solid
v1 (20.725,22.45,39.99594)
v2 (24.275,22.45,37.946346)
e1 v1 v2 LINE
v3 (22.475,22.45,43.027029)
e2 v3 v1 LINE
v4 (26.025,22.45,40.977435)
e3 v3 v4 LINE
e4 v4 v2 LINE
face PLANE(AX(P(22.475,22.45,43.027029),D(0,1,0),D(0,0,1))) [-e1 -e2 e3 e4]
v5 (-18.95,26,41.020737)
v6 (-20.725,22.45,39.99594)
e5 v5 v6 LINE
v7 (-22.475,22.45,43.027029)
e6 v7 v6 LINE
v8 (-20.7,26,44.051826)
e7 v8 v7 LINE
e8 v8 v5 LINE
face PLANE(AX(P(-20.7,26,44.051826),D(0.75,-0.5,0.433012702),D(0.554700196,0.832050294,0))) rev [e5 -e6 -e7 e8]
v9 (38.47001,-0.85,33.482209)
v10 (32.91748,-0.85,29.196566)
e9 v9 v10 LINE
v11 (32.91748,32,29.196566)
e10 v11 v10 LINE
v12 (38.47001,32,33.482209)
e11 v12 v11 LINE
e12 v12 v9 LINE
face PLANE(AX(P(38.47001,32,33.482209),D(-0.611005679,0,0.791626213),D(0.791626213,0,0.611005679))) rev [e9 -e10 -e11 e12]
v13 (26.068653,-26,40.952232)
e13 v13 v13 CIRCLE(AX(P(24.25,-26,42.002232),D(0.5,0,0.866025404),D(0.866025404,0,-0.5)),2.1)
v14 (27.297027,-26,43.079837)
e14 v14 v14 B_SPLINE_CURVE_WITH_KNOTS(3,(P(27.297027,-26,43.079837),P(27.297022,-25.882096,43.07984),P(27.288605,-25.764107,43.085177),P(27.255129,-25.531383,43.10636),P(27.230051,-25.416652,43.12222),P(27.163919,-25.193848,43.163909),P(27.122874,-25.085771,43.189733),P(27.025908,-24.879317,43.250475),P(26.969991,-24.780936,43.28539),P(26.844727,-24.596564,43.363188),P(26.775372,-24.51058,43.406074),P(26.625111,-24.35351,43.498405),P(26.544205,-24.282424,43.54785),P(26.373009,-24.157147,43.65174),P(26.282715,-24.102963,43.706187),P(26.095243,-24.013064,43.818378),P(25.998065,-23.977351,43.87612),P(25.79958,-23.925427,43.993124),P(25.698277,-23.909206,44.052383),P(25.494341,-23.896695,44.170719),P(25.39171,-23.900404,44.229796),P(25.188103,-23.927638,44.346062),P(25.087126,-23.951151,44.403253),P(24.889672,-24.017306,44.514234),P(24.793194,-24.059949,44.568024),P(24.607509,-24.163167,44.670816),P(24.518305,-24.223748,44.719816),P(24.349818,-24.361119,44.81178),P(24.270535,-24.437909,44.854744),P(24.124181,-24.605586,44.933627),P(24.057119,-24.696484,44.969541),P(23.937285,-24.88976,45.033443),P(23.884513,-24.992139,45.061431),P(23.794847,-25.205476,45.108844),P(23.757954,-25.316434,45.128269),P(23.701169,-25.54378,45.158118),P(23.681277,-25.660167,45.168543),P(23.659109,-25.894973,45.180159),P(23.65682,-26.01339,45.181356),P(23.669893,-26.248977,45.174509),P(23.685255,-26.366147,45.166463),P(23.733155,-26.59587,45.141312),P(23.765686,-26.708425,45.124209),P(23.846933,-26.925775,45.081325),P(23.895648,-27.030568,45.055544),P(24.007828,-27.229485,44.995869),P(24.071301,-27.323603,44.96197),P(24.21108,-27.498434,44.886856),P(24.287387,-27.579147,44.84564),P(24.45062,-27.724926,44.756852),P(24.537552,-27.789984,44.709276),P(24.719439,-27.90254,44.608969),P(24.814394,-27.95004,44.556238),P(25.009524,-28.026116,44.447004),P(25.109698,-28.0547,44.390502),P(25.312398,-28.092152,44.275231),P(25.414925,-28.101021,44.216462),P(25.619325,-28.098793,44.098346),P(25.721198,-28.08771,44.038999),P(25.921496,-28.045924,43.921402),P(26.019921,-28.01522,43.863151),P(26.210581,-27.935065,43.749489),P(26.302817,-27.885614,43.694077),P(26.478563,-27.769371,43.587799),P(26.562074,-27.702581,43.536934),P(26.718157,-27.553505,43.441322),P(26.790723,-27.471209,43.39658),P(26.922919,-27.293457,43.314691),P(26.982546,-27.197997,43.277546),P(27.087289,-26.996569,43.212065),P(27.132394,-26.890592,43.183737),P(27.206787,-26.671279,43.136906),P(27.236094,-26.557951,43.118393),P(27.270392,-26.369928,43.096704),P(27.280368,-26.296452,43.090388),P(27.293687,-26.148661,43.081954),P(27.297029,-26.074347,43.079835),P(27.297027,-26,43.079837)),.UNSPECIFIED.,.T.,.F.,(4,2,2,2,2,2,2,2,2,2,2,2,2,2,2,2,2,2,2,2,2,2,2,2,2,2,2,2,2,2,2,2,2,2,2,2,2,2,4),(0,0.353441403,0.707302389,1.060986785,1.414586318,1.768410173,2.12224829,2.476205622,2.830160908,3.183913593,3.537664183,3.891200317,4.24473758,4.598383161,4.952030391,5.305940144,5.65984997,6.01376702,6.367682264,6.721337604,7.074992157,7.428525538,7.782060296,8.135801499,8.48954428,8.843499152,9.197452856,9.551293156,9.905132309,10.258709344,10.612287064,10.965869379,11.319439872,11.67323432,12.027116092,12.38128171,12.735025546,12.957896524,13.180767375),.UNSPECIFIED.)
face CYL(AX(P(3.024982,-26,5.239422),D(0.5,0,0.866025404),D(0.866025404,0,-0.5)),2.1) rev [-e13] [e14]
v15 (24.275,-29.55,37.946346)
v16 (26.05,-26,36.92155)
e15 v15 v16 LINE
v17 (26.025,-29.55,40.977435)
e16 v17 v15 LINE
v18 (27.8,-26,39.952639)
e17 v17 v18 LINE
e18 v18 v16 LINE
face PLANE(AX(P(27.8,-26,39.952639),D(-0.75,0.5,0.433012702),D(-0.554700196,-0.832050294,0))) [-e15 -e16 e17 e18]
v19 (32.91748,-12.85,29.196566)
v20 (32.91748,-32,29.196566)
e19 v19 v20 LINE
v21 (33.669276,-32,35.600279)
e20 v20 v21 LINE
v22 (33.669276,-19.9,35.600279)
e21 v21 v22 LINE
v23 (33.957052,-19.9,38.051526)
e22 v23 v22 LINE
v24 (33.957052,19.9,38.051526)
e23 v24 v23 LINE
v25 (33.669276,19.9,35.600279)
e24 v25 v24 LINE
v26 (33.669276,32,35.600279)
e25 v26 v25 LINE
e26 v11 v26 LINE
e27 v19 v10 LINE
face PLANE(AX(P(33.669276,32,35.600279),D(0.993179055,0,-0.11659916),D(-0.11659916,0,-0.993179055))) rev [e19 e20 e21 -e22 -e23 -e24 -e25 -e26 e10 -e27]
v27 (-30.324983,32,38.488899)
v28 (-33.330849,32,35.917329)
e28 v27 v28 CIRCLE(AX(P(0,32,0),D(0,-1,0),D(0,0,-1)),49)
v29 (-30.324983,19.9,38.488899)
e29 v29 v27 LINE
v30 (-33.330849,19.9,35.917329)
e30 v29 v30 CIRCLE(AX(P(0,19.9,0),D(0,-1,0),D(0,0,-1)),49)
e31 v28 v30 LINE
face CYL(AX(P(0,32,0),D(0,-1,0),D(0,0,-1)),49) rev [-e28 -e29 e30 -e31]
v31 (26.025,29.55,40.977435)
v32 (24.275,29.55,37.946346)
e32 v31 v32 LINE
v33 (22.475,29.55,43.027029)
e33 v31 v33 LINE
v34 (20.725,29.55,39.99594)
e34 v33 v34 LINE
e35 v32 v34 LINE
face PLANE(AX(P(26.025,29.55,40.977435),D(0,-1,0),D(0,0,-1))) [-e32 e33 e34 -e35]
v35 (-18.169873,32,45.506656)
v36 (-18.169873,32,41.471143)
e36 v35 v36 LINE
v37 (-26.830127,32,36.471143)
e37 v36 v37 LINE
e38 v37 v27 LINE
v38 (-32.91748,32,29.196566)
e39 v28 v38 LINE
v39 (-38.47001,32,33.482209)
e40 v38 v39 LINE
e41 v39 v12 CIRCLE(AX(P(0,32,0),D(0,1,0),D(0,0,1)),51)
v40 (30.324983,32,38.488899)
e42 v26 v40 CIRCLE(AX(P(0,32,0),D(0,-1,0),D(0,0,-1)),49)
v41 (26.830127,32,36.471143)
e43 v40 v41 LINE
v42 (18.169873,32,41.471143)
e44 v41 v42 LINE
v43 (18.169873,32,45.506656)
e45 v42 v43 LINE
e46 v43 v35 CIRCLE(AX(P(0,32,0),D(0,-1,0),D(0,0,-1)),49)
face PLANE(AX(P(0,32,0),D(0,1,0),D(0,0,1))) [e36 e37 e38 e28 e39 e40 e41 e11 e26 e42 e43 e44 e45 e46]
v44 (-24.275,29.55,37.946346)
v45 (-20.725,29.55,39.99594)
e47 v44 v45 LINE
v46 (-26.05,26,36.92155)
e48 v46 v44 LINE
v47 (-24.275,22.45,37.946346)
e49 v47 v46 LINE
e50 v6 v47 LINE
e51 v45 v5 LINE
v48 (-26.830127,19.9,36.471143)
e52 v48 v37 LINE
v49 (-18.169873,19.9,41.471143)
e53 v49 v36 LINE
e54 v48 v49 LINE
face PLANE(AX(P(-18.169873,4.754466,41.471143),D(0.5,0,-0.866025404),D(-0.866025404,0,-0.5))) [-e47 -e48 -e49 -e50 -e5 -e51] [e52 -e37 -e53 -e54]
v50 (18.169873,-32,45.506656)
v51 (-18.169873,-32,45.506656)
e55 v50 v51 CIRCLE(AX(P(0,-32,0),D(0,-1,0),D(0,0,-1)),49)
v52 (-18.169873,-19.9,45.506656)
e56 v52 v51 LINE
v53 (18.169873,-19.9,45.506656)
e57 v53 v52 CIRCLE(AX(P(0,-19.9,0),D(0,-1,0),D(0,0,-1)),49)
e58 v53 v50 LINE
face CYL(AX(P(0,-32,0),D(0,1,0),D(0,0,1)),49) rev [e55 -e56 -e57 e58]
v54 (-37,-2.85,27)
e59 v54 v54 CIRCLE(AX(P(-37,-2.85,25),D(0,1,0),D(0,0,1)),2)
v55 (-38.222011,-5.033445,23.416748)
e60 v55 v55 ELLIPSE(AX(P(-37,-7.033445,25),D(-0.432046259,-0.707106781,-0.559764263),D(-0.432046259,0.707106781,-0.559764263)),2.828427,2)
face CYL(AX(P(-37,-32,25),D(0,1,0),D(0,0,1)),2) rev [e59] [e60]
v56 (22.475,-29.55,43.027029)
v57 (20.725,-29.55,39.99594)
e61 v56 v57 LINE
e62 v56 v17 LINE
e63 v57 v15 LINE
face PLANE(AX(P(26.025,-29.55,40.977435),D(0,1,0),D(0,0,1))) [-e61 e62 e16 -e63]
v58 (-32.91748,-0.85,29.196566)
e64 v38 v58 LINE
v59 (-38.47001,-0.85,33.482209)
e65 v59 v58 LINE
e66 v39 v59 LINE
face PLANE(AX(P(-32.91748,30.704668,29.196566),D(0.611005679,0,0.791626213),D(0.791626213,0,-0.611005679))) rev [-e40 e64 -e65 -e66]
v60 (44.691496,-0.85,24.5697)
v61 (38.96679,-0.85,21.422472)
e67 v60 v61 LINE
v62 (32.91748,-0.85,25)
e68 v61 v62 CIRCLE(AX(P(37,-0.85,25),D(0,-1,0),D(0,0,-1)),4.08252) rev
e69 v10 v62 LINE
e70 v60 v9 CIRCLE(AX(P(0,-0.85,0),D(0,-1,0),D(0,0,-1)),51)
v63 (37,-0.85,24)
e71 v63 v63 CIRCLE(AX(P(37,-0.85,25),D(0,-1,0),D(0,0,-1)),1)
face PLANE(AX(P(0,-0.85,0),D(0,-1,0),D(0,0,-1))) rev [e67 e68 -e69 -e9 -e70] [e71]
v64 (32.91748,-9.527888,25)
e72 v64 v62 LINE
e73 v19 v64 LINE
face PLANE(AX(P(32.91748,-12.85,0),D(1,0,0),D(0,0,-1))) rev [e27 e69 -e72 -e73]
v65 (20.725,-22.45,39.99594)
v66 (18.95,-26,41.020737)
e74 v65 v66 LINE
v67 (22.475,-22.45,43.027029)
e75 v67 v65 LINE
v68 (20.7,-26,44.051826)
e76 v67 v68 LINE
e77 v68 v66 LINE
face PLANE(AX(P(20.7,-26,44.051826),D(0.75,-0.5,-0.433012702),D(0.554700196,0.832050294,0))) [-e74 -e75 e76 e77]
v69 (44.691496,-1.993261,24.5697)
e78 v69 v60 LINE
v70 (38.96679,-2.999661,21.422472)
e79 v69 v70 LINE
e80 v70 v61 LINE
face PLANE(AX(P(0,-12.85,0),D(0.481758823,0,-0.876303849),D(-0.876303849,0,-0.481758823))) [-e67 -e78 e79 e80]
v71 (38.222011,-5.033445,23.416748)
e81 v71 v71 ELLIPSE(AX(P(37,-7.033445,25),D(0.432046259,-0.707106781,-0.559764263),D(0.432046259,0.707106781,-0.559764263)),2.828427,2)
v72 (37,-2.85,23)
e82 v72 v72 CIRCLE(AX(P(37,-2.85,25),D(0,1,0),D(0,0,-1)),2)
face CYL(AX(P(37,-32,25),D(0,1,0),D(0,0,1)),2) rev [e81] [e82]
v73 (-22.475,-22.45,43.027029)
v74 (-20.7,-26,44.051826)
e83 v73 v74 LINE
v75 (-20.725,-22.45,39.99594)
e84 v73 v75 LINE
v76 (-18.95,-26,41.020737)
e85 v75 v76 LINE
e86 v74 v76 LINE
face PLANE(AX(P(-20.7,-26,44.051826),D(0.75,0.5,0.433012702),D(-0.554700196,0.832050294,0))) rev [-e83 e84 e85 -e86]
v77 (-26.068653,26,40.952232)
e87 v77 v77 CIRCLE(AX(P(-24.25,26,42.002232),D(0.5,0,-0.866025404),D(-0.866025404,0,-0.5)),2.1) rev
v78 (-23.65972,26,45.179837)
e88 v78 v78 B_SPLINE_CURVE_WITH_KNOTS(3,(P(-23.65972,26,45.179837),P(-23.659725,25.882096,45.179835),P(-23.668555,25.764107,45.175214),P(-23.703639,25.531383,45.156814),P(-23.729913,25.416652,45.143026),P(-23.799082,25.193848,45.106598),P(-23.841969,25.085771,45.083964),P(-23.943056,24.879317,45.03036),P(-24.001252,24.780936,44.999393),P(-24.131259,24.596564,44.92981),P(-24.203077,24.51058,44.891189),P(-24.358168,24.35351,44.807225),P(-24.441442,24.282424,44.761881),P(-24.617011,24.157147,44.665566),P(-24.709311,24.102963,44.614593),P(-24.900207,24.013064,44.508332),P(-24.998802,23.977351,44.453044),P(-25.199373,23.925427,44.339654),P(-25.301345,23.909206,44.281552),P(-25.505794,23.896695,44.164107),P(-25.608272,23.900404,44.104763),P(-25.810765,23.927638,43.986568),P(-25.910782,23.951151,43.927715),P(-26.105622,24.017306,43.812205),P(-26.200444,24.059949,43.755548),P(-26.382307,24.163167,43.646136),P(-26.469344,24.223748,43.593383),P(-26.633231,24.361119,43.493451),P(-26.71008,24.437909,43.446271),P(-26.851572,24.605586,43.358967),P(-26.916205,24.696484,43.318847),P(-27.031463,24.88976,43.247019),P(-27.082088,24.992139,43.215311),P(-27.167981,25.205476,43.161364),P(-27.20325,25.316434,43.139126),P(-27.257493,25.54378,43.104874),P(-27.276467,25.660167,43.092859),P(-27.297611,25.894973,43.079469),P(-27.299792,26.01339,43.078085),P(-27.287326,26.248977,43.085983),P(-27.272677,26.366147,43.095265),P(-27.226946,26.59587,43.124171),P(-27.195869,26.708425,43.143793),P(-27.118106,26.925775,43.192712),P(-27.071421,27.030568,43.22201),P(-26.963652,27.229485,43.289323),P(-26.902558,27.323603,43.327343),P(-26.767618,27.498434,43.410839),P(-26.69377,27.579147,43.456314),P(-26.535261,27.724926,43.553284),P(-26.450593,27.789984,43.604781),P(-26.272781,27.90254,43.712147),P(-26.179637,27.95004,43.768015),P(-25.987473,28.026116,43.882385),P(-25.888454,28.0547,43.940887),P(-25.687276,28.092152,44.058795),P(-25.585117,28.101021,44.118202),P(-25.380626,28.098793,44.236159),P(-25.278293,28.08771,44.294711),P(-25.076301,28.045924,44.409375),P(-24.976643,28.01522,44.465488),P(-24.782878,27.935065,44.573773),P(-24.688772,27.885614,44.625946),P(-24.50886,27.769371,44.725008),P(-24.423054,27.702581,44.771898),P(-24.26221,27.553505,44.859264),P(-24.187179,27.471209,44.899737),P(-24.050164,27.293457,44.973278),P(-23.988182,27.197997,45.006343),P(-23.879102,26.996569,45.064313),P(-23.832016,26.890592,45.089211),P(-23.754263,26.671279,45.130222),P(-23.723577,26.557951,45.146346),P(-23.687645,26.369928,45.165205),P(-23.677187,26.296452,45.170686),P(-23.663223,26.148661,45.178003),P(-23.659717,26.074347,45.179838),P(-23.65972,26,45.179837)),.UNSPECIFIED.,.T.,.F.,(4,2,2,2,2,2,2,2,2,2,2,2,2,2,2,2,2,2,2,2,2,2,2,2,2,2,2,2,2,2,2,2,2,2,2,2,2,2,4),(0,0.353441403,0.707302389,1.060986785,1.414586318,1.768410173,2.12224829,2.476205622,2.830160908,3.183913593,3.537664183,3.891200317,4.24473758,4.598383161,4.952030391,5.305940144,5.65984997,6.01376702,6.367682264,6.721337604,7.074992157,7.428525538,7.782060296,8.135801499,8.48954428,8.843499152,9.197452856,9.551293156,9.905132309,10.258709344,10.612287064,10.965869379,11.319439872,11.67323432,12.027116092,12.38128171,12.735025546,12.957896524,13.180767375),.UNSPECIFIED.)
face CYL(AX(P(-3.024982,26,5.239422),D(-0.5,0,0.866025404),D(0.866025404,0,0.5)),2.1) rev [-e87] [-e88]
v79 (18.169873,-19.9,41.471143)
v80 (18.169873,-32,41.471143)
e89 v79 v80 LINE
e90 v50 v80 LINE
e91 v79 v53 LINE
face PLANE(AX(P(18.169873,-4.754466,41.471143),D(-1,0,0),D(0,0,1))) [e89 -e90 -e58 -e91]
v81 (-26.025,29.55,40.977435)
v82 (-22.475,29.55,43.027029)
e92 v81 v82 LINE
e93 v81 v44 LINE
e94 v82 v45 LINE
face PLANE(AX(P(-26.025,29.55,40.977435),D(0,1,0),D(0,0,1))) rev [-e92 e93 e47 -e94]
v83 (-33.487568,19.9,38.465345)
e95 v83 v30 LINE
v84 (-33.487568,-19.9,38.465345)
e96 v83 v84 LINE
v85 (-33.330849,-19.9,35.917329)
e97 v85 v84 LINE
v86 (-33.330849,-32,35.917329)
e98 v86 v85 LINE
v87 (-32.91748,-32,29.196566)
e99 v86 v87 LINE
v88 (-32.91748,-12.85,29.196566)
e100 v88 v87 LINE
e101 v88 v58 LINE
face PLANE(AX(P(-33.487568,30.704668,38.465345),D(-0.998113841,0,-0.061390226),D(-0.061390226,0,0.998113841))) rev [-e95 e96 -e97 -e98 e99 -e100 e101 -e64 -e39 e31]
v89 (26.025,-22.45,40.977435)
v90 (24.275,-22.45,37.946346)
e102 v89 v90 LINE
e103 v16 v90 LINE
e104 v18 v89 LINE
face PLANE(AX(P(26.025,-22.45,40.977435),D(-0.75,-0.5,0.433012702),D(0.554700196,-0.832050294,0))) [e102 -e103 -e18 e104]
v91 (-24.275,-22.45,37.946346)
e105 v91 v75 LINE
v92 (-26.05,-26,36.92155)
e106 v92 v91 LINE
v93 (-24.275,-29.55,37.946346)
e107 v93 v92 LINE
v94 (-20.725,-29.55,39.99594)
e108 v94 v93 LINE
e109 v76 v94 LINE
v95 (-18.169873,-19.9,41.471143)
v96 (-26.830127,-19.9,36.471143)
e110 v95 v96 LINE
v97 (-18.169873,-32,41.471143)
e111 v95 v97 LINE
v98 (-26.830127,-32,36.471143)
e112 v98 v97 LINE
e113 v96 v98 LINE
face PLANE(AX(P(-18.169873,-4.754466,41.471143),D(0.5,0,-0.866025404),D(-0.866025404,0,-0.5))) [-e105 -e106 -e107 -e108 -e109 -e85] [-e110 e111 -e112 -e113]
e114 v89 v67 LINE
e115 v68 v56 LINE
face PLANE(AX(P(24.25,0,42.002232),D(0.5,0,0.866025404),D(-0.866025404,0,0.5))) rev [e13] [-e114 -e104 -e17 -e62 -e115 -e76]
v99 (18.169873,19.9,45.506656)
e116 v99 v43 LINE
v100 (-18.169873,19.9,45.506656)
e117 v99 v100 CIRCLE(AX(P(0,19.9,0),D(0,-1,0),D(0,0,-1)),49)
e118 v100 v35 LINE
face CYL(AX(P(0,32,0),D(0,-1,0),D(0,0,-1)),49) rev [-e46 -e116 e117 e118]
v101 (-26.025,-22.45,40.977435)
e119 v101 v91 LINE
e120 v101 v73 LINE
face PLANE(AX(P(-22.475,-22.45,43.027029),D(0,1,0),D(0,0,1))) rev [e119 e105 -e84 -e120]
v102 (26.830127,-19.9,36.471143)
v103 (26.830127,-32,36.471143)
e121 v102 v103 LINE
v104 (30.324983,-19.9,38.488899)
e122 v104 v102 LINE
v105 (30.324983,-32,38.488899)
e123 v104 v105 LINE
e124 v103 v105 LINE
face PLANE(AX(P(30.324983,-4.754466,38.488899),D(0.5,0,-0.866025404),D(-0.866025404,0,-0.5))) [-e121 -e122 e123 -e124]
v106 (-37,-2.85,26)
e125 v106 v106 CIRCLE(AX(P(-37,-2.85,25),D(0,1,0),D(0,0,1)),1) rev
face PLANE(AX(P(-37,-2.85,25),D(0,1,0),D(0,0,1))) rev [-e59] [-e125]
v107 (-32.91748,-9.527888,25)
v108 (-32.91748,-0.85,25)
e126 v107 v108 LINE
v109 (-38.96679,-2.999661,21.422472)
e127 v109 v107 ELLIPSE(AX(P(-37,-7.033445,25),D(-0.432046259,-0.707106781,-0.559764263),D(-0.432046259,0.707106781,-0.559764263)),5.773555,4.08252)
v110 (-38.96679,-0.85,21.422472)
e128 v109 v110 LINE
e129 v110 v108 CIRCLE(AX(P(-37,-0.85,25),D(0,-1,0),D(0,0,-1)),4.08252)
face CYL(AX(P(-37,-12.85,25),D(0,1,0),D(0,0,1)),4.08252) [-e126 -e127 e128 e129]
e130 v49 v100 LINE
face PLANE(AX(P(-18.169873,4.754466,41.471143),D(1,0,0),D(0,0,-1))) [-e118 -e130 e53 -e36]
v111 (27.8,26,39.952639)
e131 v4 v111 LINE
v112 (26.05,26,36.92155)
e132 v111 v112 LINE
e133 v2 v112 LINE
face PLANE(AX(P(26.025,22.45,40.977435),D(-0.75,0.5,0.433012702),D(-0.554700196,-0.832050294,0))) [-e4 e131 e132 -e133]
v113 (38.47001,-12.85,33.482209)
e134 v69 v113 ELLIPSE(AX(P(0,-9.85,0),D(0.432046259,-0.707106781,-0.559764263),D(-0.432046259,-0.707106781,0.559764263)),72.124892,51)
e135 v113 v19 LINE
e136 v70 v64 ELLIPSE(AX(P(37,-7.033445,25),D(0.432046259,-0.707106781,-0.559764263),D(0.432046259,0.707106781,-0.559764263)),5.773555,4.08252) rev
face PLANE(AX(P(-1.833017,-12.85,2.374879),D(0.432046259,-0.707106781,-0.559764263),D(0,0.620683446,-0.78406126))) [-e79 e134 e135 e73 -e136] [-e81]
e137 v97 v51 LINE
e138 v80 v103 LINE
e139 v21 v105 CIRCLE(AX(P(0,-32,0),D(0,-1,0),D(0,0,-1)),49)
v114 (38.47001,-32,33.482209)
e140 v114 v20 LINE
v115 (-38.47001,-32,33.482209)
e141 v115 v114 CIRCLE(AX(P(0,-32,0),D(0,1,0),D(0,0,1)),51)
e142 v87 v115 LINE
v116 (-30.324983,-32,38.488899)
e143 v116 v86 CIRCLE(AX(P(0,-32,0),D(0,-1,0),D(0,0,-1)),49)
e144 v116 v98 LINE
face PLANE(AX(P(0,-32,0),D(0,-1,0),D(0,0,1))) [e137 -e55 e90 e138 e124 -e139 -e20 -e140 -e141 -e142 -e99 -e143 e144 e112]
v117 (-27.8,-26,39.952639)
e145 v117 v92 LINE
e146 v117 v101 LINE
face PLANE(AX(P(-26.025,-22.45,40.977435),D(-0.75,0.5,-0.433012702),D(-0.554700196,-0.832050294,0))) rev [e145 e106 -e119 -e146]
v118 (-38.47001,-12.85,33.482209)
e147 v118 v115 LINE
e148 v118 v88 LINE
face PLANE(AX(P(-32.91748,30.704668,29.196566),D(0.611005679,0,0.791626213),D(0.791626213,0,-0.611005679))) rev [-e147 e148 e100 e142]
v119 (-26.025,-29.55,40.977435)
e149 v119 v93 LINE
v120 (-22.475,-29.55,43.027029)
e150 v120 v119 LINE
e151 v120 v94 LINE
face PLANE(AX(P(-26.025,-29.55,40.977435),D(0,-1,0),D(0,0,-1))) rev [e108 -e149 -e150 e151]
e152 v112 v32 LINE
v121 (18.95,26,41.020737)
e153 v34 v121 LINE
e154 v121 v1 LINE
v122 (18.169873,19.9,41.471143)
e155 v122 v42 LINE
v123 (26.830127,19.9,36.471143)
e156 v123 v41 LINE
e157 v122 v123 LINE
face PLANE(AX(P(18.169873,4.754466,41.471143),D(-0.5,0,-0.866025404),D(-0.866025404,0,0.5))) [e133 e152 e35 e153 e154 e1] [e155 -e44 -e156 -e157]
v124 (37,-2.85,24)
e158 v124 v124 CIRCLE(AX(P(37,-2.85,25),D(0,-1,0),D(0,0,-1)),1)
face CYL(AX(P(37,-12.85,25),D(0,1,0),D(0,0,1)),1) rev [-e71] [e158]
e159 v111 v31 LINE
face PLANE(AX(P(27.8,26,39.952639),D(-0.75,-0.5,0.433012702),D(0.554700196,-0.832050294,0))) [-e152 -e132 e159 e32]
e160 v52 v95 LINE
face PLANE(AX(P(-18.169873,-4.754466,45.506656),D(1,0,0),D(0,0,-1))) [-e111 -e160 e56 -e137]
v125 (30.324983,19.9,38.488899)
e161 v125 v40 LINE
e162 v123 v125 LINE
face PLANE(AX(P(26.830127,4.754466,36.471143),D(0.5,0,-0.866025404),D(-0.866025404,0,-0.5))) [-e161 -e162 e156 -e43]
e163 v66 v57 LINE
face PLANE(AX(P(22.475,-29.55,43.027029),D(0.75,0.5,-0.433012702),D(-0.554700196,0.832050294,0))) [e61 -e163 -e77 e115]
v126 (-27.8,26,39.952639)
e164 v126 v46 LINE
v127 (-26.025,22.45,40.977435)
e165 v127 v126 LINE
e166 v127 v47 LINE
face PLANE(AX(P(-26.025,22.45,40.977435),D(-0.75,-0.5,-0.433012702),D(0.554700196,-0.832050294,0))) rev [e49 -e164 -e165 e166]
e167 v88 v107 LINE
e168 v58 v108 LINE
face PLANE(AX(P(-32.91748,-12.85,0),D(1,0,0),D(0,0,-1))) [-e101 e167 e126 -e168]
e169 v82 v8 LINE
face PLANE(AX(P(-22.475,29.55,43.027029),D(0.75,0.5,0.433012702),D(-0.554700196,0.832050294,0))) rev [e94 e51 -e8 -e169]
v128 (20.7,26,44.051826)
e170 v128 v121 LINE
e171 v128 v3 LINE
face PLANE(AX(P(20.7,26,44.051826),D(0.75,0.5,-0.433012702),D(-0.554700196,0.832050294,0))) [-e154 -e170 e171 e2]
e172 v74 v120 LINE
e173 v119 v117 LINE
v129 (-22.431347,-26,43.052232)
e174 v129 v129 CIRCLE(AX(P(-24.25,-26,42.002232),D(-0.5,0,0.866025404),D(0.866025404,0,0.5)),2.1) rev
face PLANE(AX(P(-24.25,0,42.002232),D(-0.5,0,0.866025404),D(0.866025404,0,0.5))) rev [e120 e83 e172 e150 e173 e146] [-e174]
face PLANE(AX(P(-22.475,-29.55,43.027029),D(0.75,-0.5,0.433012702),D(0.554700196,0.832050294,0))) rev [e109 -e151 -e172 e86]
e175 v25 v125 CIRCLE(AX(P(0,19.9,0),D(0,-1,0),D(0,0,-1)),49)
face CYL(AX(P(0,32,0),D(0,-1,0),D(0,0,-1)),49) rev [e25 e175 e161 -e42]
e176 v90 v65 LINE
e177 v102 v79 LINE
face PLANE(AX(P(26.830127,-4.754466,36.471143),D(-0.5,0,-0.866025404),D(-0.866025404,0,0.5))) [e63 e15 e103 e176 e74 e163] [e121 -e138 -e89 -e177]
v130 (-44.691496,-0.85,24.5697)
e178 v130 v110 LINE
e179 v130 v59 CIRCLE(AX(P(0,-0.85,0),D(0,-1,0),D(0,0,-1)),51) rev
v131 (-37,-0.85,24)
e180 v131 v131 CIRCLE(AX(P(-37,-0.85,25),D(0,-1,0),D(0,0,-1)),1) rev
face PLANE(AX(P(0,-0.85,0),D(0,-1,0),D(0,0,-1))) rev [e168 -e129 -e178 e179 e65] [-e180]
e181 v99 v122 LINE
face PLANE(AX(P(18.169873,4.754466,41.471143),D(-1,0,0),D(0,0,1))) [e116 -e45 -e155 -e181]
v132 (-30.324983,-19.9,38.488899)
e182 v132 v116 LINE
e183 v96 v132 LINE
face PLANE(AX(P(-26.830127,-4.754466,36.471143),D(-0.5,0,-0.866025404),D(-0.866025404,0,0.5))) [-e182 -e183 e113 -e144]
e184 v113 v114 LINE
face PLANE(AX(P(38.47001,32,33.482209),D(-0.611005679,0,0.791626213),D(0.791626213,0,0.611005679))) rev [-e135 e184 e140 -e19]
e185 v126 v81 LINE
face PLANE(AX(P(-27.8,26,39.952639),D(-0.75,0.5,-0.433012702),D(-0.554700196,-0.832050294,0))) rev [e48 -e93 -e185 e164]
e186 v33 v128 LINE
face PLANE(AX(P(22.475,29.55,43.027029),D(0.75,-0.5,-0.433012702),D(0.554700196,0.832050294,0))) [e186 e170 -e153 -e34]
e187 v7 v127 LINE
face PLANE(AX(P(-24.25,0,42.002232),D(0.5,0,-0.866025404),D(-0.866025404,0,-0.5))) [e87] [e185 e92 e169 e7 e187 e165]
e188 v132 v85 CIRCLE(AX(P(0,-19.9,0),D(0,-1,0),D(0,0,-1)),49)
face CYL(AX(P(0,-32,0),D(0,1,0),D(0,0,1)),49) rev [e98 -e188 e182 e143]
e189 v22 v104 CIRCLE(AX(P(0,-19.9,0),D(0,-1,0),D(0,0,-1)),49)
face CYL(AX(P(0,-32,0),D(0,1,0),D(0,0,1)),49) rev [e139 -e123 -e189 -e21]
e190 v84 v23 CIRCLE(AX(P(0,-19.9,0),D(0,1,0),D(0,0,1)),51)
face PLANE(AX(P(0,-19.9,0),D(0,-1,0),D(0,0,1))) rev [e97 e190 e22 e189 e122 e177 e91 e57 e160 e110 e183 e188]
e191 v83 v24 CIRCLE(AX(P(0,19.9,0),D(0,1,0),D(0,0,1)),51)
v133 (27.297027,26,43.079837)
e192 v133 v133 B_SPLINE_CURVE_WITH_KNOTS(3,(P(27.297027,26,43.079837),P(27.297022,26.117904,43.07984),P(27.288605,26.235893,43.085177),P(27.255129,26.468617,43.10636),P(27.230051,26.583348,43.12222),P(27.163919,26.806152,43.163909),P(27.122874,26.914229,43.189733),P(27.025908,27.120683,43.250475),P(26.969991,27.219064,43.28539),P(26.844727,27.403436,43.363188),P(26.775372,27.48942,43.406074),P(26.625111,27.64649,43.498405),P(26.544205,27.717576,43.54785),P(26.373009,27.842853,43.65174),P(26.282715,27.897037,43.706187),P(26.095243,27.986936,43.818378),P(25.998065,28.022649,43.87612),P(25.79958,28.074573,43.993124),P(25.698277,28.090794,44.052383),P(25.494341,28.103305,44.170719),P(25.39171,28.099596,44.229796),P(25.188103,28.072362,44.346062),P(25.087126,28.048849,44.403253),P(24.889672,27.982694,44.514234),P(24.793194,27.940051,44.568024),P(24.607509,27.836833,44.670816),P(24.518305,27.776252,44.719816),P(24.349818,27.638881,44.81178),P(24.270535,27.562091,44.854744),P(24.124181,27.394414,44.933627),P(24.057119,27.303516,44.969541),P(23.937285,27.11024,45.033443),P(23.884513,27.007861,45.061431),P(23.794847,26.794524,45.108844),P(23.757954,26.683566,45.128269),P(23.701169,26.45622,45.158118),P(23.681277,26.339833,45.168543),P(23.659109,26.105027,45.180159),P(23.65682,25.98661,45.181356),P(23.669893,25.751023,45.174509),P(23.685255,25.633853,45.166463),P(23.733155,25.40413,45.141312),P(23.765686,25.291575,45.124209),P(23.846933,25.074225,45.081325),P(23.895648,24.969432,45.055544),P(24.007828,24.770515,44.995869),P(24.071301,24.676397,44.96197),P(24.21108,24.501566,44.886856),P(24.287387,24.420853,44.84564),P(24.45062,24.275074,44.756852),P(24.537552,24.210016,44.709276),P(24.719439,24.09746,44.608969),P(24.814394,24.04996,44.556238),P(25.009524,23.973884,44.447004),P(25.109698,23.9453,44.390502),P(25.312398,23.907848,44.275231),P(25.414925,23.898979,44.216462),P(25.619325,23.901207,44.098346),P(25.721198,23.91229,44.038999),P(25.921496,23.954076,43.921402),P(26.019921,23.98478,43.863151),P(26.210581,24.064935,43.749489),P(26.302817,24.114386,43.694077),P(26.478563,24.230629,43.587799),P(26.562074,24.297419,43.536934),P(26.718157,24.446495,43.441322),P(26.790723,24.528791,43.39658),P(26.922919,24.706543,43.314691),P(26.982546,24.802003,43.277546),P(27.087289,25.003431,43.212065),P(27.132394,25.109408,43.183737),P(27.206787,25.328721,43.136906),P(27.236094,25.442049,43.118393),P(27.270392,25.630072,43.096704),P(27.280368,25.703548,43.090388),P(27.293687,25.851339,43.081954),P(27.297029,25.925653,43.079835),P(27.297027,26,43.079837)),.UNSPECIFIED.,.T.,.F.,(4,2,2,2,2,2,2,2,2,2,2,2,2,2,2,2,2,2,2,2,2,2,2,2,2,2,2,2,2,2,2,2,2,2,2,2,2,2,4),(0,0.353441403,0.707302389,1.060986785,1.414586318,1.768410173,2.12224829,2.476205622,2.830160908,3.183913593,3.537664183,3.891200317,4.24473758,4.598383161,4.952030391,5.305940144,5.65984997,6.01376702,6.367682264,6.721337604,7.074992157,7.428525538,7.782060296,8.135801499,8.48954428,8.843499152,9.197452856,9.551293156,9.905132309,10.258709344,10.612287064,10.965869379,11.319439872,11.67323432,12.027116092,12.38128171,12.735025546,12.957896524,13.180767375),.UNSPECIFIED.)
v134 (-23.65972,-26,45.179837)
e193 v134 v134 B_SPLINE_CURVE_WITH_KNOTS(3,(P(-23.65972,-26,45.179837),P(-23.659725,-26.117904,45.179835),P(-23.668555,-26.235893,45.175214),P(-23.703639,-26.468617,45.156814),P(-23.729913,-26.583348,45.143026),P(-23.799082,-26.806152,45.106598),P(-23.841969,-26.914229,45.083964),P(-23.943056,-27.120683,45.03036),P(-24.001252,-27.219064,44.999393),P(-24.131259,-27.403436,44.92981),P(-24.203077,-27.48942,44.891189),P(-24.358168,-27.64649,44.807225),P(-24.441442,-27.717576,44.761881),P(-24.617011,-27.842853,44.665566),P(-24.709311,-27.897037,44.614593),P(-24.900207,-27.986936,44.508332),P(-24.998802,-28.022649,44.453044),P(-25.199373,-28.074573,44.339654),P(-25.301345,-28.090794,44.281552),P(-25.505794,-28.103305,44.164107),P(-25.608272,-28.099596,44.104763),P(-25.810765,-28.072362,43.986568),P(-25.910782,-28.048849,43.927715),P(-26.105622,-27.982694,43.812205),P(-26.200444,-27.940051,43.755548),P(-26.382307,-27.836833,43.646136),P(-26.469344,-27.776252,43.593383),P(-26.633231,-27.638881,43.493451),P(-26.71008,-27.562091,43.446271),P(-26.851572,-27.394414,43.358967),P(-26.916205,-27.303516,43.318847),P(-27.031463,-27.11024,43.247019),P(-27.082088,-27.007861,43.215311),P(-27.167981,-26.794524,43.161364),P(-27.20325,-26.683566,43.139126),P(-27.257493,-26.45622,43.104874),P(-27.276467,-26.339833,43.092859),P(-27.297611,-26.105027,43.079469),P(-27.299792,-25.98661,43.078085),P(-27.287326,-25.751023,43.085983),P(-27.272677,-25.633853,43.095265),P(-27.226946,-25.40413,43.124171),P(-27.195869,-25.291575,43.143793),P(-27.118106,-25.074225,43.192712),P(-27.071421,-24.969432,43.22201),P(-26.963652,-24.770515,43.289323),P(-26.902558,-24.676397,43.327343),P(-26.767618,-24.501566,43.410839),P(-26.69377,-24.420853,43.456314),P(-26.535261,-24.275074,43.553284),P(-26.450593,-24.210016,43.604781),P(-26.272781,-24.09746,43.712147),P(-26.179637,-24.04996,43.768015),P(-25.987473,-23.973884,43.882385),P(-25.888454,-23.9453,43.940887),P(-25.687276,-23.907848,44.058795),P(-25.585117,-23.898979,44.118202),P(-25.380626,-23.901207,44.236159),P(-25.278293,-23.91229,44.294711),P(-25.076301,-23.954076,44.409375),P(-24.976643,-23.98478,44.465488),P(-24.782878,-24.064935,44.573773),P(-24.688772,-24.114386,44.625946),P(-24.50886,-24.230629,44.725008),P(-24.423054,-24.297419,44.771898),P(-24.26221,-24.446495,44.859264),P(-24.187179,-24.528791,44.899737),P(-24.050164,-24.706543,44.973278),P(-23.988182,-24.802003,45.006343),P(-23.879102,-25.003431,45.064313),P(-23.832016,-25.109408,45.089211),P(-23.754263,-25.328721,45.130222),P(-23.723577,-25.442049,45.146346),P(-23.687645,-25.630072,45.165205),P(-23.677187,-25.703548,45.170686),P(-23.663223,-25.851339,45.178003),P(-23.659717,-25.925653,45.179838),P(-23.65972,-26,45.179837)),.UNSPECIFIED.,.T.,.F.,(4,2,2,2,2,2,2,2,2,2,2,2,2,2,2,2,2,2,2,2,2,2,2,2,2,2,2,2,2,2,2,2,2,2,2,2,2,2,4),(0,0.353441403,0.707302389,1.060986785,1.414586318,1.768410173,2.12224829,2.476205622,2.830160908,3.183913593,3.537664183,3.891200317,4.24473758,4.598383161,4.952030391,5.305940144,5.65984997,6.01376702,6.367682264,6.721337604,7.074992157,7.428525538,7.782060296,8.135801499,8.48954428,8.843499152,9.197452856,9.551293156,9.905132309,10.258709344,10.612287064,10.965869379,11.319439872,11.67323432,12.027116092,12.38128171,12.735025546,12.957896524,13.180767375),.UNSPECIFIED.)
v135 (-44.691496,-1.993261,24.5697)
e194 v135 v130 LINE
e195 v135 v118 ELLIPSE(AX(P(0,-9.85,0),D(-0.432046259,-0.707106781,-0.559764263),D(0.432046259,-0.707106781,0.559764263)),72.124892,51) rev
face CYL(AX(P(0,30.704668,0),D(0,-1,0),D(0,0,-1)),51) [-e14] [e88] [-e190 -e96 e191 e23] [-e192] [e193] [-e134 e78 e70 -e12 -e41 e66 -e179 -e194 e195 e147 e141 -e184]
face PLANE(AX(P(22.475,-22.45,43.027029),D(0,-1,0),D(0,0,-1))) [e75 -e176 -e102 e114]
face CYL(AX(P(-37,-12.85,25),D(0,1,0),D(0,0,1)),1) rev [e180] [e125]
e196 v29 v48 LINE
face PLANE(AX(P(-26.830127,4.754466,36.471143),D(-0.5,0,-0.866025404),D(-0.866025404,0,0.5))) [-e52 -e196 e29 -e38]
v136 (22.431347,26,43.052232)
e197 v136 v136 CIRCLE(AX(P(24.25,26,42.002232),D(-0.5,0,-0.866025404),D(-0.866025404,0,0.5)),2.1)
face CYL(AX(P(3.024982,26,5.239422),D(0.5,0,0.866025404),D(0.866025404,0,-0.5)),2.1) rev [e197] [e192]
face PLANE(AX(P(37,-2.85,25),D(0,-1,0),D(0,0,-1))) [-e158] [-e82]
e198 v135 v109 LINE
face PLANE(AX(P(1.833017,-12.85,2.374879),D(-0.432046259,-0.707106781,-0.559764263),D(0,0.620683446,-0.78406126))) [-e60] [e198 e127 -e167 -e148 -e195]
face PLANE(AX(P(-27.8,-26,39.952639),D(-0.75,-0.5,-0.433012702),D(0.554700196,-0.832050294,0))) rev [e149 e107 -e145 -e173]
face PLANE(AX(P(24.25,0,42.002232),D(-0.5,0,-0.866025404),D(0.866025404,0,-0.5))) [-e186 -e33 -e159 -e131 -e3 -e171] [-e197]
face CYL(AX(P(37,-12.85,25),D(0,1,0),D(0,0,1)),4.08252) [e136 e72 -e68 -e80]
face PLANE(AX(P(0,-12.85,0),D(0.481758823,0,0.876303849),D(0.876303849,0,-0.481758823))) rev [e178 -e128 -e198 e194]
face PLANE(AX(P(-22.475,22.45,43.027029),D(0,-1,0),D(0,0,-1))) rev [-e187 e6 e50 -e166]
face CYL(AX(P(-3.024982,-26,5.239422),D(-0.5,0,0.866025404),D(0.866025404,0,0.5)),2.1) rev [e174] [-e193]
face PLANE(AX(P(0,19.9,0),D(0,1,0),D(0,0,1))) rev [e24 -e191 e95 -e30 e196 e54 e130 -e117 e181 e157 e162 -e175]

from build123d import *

# Parameters (mm, degrees)
EXTRUDE_1_DEPTH        = 19.9
EXTRUDE_1_DEPTH_BACK   = 19.9
EXTRUDE_1_2_DEPTH      = 19.9
EXTRUDE_1_2_DEPTH_BACK = 19.9
EXTRUDE_2_DEPTH        = 12.1
EXTRUDE_4_DEPTH        = 12.1
EXTRUDE_5_DEPTH        = 12.1
SKETCH_4_R             = 2.1
CUT_EXTRUDE_1_DEPTH    = 74.077252942
CUT_EXTRUDE_2_DEPTH    = 3.5
SKETCH_9_R             = 1
EXTRUDE_6_DEPTH        = 12
DRAFT_START            = -52
DRAFT_3_DEPTH          = 11.517207928
DRAFT_START_2          = 40.482792072
DRAFT_5_DEPTH          = 11.517207928
SKETCH_10_R            = 2
CUT_EXTRUDE_3_DEPTH    = 77.242064239


with BuildPart() as part:
    # Эскиз1 → Бобышка-Вытянуть1 (new, two sides: drawn at the far end of the back side and taken through both)
    with BuildSketch(Plane(origin=(0, 0, 0), x_dir=(1, 0, 0), z_dir=(0, 1, 0)).offset(-EXTRUDE_1_DEPTH_BACK)):
        with BuildLine():
            Line((38.470009909, -33.482209271), (32.917480236, -29.196566492))
            Line((32.917480236, -29.196566492), (33.95705193, -38.051525912))
            ThreePointArc((33.95705193, -38.051525912), (36.285527215, -35.837975874), (38.470009909, -33.482209271))
        make_face()
    extrude(amount=EXTRUDE_1_DEPTH + EXTRUDE_1_DEPTH_BACK)



with BuildPart() as body_2:
    # Эскиз1 → Extrude 1 2 (new, two sides: drawn at the far end of the back side and taken through both)
    with BuildSketch(Plane(origin=(0, 0, 0), x_dir=(1, 0, 0), z_dir=(0, 1, 0)).offset(-EXTRUDE_1_2_DEPTH_BACK)):
        with BuildLine():
            Line((-32.917480236, -29.196566492), (-38.470009909, -33.482209271))
            ThreePointArc((-38.470009909, -33.482209271), (-36.064957562, -36.059933944), (-33.487567945, -38.465345353))
            Line((-33.487567945, -38.465345353), (-32.917480236, -29.196566492))
        make_face()
    extrude(amount=EXTRUDE_1_2_DEPTH + EXTRUDE_1_2_DEPTH_BACK)


with BuildPart() as part_1:
    add(part.part)

    add(body_2.part)  # Бобышка-Вытянуть2 merges body 2
    # Эскиз2 → Бобышка-Вытянуть2 (add)
    with BuildSketch(Plane(origin=(0, 19.9, 0), x_dir=(1, 0, 0), z_dir=(0, 1, 0))):
        with BuildLine():
            Line((-32.917480236, -29.196566492), (-38.470009909, -33.482209271))
            ThreePointArc((-38.470009909, -33.482209271), (-36.064957562, -36.059933944), (-33.487567945, -38.465345353))
            ThreePointArc((-33.487567945, -38.465345353), (0.312914422, -50.999040036), (33.95705193, -38.051525912))
            ThreePointArc((33.95705193, -38.051525912), (36.285527215, -35.837975874), (38.470009909, -33.482209271))
            Line((38.470009909, -33.482209271), (32.917480236, -29.196566492))
            Line((32.917480236, -29.196566492), (33.669275707, -35.60027912))
            ThreePointArc((33.669275707, -35.60027912), (0.231869073, -48.999451392), (-33.33084903, -35.917328727))
            Line((-33.33084903, -35.917328727), (-32.917480236, -29.196566492))
        make_face()
    extrude_2 = extrude(amount=EXTRUDE_2_DEPTH)

    # Зеркальное отражение4: Бобышка-Вытянуть2 across plane
    add(extrude_2.mirror(Plane.ZX))

    # Эскиз5 → Бобышка-Вытянуть4 (add)
    with BuildSketch(Plane(origin=(0, 32, 0), x_dir=(1, 0, 0), z_dir=(0, 1, 0))):
        with BuildLine():
            Line((-18.169872981, -41.47114317), (-26.830127019, -36.47114317))
            Line((-26.830127019, -36.47114317), (-30.324983414, -38.488899451))
            ThreePointArc((-30.324983414, -38.488899451), (-24.5, -42.435244785), (-18.169872981, -45.506655731))
            Line((-18.169872981, -45.506655731), (-18.169872981, -41.47114317))
        make_face()
        with BuildLine():
            Line((26.830127019, -36.47114317), (30.324983414, -38.488899451))
            ThreePointArc((30.324983414, -38.488899451), (24.5, -42.435244785), (18.169872981, -45.506655731))
            Line((18.169872981, -45.506655731), (18.169872981, -41.47114317))
            Line((18.169872981, -41.47114317), (26.830127019, -36.47114317))
        make_face()
    extrude(amount=-EXTRUDE_4_DEPTH)

    # Эскиз6 → Бобышка-Вытянуть5 (add)
    with BuildSketch(Plane.XZ.offset(32)):
        with BuildLine():
            Line((18.169872981, 41.47114317), (18.169872981, 45.506655731))
            ThreePointArc((18.169872981, 45.506655731), (24.5, 42.435244785), (30.324983414, 38.488899451))
            Line((30.324983414, 38.488899451), (26.830127019, 36.47114317))
            Line((26.830127019, 36.47114317), (18.169872981, 41.47114317))
        make_face()
        with BuildLine():
            Line((-26.830127019, 36.47114317), (-30.324983414, 38.488899451))
            ThreePointArc((-30.324983414, 38.488899451), (-24.5, 42.435244785), (-18.169872981, 45.506655731))
            Line((-18.169872981, 45.506655731), (-18.169872981, 41.47114317))
            Line((-18.169872981, 41.47114317), (-26.830127019, 36.47114317))
        make_face()
    extrude(amount=-EXTRUDE_5_DEPTH)

    # Эскиз4 → Вырез-Вытянуть1 (cut, through all)
    with BuildSketch(Plane(origin=(-25.5, 0, 44.167295593), x_dir=(0.8660254037844417, 0, 0.4999999999999947), z_dir=(-0.4999999999999947, 0, 0.8660254037844417))):
        with Locations((0, -26)):
            Circle(SKETCH_4_R)
        with Locations((0, 26)):
            Circle(SKETCH_4_R)
    cut_extrude_1 = extrude(amount=-CUT_EXTRUDE_1_DEPTH, mode=Mode.SUBTRACT)

    # Зеркальное отражение5: Вырез-Вытянуть1 across plane
    add(cut_extrude_1.mirror(Plane(origin=(0, 0, 0), x_dir=(0, 0, 1), z_dir=(1, 0, 0))), mode=Mode.SUBTRACT)

    # Эскиз7 → Вырез-Вытянуть2 (cut)
    with BuildSketch(Plane(origin=(-22.5, 0, 38.97114317), x_dir=(-0.866025403784438, 0, -0.5000000000000011), z_dir=(0.5000000000000011, 0, -0.8660254037844382))):
        Polygon((4.099186911, 26), (2.049593456, 29.55), (-2.049593456, 29.55), (-4.099186911, 26), (-2.049593456, 22.45), (2.049593456, 22.45), align=None)
        Polygon((2.049593456, -22.45), (4.099186911, -26), (2.049593456, -29.55), (-2.049593456, -29.55), (-4.099186911, -26), (-2.049593456, -22.45), align=None)
    cut_extrude_2 = extrude(amount=-CUT_EXTRUDE_2_DEPTH, mode=Mode.SUBTRACT)

    # Зеркальное отражение7: Вырез-Вытянуть2 across plane
    add(cut_extrude_2.mirror(Plane(origin=(0, 0, 0), x_dir=(0, 0, 1), z_dir=(1, 0, 0))), mode=Mode.SUBTRACT)

    # Эскиз9 → Бобышка-Вытянуть6 (add)
    # profile 1 of 2: a face of its own
    with BuildSketch(Plane(origin=(0, -0.85, 0), x_dir=(-1, 0, 0), z_dir=(0, -1, 0))):
        with BuildLine():
            ThreePointArc((-44.691496308, -24.569699993), (-41.818862185, -29.192169593), (-38.470009909, -33.482209271))
            Line((-38.470009909, -33.482209271), (-32.917480236, -29.196566492))
            Line((-32.917480236, -29.196566492), (-32.917480236, -25))
            ThreePointArc((-32.917480236, -25), (-34.921838684, -21.485997557), (-38.966789918, -21.422472216))
            Line((-38.966789918, -21.422472216), (-44.691496308, -24.569699993))
        make_face()
        with Locations(Location((-37, -25, 0), (0, 0, 90))):
            Circle(SKETCH_9_R, mode=Mode.SUBTRACT)
    # profile 2 of 2: a face of its own
    with BuildSketch(Plane(origin=(0, -0.85, 0), x_dir=(-1, 0, 0), z_dir=(0, -1, 0))):
        with BuildLine():
            ThreePointArc((38.470009909, -33.482209271), (41.818862185, -29.192169593), (44.691496308, -24.569699993))
            Line((44.691496308, -24.569699993), (38.966789918, -21.422472216))
            ThreePointArc((38.966789918, -21.422472216), (34.921838684, -21.485997557), (32.917480236, -25))
            Line((32.917480236, -25), (32.917480236, -29.196566492))
            Line((32.917480236, -29.196566492), (38.470009909, -33.482209271))
        make_face()
        with Locations(Location((37, -25, 0), (0, 0, 90))):
            Circle(SKETCH_9_R, mode=Mode.SUBTRACT)
    extrude(amount=EXTRUDE_6_DEPTH)

    # Уклон3: read off the stored shape, not the designer's step
    # Уклон3 outline → Уклон3 (cut)
    with BuildSketch(Plane(origin=(0, 0, 0), x_dir=(0.6110056787485416, 0, 0.7916262126389156), z_dir=(0.7916262126389156, 0, -0.611005678748542)).offset(DRAFT_START)):
        Polygon((-9, 0.85), (3, 12.85), (-9, 12.85), align=None)
    extrude(amount=DRAFT_3_DEPTH, mode=Mode.SUBTRACT)

    # Уклон5: read off the stored shape, not the designer's step
    # Уклон5 outline → Уклон5 (cut)
    with BuildSketch(Plane(origin=(0, 0, 0), x_dir=(0.6110056787485442, 0, -0.7916262126389138), z_dir=(0.7916262126389138, 0, 0.6110056787485444)).offset(DRAFT_START_2)):
        Polygon((9, -0.85), (-3, -12.85), (9, -12.85), align=None)
    extrude(amount=DRAFT_5_DEPTH, mode=Mode.SUBTRACT)

    # Эскиз10 → Вырез-Вытянуть3 (cut, through all)
    with BuildSketch(Plane(origin=(0, -2.85, 0), x_dir=(1, 0, 0), z_dir=(0, 1, 0))):
        with Locations(Location((-37, -25, 0), (0, 0, 270))):
            Circle(SKETCH_10_R)
        with Locations(Location((37, -25, 0), (0, 0, 52.337744339))):
            Circle(SKETCH_10_R)
    extrude(amount=-CUT_EXTRUDE_3_DEPTH, mode=Mode.SUBTRACT)


solid = part_1.part
